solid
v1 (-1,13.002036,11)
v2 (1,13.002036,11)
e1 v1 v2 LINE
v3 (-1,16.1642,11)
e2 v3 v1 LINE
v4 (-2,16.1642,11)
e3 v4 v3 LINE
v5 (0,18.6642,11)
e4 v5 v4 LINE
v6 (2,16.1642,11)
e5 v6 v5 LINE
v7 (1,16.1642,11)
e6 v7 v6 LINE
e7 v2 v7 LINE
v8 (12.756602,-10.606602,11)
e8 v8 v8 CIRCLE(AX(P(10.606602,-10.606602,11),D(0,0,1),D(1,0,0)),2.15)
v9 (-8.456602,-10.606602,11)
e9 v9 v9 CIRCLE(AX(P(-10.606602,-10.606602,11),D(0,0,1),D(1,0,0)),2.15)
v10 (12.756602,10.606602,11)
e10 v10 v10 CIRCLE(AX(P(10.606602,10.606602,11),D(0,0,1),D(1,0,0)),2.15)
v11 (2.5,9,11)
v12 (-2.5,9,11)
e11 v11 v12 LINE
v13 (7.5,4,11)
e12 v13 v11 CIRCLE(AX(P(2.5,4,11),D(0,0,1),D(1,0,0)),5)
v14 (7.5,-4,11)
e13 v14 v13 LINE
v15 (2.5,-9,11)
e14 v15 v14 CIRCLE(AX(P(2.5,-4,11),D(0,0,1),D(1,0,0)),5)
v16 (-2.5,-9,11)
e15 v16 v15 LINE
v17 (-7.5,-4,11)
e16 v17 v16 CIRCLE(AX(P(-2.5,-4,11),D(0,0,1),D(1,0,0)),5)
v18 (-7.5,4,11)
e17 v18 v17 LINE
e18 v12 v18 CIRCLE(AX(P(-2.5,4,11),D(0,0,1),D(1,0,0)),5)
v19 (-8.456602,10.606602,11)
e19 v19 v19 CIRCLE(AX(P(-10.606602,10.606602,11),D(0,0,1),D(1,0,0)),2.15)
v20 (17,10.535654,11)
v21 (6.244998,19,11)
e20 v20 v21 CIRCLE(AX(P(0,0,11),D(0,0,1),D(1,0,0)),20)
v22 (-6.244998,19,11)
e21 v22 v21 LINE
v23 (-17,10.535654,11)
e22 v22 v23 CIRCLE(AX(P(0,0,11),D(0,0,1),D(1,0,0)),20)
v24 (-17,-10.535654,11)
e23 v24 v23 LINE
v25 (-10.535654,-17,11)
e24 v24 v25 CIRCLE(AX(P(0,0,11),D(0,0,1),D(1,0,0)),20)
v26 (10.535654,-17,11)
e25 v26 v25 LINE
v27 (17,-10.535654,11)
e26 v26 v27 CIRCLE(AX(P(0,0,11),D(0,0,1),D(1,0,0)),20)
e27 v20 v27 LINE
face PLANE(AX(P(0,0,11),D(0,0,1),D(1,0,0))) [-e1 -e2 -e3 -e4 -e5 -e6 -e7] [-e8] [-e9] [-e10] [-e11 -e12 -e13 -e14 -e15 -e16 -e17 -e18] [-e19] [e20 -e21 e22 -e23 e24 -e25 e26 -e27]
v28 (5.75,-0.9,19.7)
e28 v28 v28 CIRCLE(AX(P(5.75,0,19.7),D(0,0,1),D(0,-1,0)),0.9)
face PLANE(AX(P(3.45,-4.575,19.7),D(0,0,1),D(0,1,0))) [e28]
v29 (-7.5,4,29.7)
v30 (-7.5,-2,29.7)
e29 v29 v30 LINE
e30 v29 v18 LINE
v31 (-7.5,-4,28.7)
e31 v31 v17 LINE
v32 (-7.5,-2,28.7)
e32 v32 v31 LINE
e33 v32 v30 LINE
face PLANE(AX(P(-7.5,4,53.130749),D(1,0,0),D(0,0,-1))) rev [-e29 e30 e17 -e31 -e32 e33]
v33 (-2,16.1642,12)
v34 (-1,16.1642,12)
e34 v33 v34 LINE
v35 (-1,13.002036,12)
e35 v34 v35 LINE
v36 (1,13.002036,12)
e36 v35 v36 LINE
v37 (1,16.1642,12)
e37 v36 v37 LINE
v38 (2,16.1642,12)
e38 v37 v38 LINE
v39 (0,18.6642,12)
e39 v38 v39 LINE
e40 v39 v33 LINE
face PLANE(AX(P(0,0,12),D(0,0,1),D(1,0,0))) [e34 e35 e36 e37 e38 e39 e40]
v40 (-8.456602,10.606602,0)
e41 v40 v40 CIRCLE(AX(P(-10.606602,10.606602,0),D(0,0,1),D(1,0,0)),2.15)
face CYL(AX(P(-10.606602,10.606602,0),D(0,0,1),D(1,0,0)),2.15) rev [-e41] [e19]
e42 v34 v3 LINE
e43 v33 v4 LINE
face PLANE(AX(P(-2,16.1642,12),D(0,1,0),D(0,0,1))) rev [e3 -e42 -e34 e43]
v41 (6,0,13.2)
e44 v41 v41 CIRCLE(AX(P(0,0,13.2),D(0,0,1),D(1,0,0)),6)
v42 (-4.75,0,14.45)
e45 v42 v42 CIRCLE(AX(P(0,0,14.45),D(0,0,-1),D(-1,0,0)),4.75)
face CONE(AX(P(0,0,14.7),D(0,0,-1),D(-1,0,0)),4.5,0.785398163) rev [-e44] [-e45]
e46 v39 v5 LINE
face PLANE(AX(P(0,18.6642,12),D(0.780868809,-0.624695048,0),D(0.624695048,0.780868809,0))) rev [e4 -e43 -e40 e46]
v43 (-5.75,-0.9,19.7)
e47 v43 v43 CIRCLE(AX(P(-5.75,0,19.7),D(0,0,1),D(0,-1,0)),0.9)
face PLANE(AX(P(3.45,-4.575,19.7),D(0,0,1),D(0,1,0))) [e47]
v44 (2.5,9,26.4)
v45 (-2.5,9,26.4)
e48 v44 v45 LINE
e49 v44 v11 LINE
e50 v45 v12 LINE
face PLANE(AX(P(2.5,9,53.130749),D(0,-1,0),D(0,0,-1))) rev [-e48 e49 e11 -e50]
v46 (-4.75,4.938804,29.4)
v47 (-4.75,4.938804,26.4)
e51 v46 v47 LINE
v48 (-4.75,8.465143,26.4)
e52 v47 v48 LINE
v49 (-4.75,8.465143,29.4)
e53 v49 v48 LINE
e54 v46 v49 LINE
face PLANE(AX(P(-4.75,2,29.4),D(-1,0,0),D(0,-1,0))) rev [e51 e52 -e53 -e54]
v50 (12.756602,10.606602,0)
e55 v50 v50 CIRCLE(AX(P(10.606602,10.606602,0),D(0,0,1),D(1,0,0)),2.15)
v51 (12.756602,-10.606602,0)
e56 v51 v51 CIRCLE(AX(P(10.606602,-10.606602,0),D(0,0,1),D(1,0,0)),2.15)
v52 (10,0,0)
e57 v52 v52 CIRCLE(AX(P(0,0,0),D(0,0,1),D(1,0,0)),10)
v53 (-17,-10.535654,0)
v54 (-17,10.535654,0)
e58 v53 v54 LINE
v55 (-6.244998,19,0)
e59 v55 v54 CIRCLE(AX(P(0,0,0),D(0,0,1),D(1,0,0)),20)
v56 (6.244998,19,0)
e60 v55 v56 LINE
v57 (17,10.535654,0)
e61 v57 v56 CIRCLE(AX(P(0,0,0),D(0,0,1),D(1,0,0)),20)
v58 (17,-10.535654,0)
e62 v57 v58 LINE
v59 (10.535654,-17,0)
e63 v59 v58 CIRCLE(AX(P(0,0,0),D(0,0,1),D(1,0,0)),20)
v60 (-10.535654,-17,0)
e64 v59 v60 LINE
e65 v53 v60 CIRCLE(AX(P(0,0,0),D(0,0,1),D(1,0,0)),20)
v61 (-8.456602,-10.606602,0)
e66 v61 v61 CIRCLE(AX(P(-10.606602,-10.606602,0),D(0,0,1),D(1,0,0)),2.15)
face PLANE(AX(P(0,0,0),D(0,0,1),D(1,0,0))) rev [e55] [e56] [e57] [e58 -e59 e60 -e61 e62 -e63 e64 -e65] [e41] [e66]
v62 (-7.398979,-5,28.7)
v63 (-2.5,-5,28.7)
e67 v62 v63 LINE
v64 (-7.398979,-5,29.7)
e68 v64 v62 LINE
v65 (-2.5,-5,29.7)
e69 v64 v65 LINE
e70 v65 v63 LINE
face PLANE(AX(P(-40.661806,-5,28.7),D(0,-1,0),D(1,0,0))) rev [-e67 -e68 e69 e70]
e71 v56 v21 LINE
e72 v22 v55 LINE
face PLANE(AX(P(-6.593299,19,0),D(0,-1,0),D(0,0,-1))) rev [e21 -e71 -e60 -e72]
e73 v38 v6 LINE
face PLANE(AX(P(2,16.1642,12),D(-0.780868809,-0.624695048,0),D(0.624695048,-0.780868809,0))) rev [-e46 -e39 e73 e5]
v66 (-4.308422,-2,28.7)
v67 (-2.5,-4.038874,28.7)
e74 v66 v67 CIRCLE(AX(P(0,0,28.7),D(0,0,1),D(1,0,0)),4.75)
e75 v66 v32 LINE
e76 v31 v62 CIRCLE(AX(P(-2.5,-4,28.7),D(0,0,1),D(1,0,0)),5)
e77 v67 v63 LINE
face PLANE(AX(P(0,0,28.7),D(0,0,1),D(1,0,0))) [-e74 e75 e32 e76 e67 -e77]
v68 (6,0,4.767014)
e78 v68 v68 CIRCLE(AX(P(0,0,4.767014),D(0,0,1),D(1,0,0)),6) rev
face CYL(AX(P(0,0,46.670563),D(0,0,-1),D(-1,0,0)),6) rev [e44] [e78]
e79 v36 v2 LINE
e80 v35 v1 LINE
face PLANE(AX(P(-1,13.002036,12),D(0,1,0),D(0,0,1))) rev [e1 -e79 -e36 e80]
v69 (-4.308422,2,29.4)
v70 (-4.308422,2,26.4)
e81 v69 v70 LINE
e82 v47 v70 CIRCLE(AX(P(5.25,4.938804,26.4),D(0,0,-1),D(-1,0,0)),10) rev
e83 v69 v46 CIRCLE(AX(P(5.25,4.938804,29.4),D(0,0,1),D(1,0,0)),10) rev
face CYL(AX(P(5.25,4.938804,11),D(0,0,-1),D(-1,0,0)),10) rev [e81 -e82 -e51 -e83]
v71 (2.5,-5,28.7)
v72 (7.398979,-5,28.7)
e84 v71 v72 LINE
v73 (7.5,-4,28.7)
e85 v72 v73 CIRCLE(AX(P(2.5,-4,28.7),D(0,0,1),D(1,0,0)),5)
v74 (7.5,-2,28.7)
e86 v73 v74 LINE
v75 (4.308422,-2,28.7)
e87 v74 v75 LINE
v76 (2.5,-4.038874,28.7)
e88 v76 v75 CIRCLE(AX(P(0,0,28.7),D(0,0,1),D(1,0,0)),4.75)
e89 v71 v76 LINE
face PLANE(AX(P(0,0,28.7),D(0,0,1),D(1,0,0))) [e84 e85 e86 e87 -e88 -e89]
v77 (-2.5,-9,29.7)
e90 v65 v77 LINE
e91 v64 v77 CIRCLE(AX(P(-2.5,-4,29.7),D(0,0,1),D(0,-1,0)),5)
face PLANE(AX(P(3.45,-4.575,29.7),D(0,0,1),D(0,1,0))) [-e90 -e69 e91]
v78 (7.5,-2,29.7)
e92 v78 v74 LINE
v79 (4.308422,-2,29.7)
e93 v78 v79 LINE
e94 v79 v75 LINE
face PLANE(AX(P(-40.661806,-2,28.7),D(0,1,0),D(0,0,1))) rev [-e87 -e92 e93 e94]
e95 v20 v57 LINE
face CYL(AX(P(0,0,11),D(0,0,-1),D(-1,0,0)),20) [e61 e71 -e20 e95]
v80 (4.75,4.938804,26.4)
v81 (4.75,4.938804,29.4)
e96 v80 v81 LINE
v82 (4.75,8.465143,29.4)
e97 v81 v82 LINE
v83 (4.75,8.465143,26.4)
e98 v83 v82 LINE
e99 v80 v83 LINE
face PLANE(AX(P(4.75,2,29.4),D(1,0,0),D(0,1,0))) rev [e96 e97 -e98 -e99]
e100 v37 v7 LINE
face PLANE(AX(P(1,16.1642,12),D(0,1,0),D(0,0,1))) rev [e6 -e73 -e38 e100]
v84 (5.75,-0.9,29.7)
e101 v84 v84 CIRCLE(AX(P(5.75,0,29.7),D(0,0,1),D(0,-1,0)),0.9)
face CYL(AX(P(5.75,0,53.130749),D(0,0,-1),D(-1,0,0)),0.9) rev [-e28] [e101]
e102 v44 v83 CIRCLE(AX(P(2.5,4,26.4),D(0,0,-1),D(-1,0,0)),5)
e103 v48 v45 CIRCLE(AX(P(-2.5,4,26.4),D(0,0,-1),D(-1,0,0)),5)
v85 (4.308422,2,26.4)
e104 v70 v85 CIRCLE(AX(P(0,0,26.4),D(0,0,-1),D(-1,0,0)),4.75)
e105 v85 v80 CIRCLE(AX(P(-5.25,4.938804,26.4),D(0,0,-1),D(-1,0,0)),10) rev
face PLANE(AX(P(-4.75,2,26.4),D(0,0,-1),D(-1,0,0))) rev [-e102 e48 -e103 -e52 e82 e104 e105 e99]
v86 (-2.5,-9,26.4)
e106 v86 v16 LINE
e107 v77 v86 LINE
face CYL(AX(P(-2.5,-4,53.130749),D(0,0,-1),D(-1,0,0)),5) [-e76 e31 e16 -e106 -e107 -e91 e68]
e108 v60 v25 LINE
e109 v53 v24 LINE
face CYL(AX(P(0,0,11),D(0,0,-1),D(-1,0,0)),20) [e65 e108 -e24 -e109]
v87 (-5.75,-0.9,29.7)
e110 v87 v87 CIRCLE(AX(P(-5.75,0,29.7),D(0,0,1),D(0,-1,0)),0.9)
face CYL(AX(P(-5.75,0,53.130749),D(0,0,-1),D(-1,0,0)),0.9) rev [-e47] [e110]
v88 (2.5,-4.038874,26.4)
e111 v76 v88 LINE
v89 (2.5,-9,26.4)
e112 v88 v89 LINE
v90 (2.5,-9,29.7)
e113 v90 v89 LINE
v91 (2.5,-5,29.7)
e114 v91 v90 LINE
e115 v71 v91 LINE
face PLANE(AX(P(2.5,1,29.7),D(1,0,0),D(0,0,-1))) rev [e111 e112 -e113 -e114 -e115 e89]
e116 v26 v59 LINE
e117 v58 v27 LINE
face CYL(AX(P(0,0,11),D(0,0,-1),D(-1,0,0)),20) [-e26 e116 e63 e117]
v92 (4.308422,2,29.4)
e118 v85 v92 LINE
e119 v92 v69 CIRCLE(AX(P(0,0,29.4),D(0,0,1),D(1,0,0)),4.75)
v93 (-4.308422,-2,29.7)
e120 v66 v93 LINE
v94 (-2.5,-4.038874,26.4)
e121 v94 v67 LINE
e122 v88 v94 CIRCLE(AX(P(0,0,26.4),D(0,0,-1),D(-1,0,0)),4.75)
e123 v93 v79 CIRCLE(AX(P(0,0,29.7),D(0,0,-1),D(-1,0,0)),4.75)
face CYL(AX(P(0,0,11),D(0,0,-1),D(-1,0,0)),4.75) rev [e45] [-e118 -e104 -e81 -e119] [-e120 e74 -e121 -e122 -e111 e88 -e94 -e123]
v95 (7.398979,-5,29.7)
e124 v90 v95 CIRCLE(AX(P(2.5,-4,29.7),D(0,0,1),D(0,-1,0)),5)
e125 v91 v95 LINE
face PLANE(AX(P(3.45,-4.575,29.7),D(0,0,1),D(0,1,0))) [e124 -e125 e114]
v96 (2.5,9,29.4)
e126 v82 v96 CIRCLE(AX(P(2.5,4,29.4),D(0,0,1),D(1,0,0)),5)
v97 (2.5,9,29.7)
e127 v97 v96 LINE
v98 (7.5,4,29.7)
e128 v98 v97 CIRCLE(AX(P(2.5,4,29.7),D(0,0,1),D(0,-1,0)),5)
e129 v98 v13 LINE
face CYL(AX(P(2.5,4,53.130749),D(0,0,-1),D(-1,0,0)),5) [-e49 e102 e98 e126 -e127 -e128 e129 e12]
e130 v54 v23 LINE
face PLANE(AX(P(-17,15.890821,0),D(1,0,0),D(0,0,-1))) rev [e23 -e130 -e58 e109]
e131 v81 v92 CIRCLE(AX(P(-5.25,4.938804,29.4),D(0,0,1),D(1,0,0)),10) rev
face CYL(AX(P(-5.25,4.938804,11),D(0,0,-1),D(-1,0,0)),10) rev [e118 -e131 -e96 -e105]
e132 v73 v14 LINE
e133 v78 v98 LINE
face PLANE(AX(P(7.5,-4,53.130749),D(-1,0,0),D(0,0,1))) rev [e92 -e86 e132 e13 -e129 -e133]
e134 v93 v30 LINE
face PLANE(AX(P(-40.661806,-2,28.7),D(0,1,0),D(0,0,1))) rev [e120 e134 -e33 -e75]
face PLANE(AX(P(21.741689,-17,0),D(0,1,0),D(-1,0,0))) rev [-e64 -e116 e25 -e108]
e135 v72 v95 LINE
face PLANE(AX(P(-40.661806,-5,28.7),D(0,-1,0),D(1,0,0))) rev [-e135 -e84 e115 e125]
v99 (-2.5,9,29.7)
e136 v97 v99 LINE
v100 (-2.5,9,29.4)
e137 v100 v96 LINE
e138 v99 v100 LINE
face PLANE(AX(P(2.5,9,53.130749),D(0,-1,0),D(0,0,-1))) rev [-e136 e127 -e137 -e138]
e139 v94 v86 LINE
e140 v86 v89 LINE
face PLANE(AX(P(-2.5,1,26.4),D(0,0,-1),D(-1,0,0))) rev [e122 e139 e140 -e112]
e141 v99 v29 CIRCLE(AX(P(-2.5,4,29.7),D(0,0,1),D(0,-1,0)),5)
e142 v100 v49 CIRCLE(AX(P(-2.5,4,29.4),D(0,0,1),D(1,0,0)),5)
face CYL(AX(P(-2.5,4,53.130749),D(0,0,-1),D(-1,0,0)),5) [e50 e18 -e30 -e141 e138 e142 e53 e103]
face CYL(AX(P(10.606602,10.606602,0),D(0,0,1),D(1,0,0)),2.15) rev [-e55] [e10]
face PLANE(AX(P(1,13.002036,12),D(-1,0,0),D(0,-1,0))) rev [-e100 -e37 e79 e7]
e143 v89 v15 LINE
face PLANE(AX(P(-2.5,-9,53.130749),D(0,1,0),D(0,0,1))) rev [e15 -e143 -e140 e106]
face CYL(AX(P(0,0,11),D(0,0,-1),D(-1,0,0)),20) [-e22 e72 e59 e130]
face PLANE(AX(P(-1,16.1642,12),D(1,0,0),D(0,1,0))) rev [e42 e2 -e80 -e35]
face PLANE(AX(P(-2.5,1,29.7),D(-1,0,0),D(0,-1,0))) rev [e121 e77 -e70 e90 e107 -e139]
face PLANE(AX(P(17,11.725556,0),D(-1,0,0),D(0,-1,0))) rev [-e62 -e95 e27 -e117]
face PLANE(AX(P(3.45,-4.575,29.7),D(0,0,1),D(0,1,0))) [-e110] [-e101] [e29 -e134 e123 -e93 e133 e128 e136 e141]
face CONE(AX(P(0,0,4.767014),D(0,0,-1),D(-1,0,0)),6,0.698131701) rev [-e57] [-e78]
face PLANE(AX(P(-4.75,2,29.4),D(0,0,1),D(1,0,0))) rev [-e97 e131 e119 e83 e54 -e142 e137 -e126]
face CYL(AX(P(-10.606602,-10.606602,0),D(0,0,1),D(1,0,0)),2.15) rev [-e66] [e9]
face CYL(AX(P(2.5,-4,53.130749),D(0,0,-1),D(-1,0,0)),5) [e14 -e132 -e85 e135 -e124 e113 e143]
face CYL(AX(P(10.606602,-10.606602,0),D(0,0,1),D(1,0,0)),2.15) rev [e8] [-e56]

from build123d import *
from build123d.topology import SkipClean

# Parameters (mm, degrees)
SKETCH1_R           = 20
SKETCH1_R_2         = 4.75
BOSS_EXTRUDE1_DEPTH = 11
SKETCH2_W           = 13.186598354
SKETCH2_H           = 1
SKETCH2_W_2         = 3
SKETCH2_H_2         = 26.426474467
SKETCH2_H_3         = 26.621798467
SKETCH2_W_3         = 40.686040312
SKETCH2_H_4         = 3
CUT_EXTRUDE1_DEPTH  = 31.347981811
SKETCH3_R           = 2.15
CUT_EXTRUDE2_DEPTH  = 28.766886754
SKETCH5_R           = 0.9
BOSS_EXTRUDE2_DEPTH = 18.7
SKETCH13_R          = 0.9
BOSS_EXTRUDE3_DEPTH = 8.7
SKETCH7_W           = 68.268212127
SKETCH7_H           = 3
CUT_EXTRUDE4_DEPTH  = 1
SKETCH10_R          = 4.75
CUT_EXTRUDE6_DEPTH  = 40.141921261
SKETCH11_W          = 9.5
SKETCH11_H          = 3
CUT_EXTRUDE7_DEPTH  = 7
SKETCH12_R          = 6
CUT_EXTRUDE8_DEPTH  = 14.7
CHAMFER2_SIZE       = 1.5
CHAMFER1_SIZE       = 4
CHAMFER1_SIZE2      = 4.76701437
FILLET2_R           = 10
SKETCH14_W          = 5
SKETCH14_H          = 3.3
CUT_EXTRUDE9_DEPTH  = 10
BOSS_EXTRUDE4_DEPTH = 1


with BuildPart() as part:
    # Sketch1 → Boss-Extrude1 (new body)
    with BuildSketch(Plane.XY):
        Circle(SKETCH1_R)
        Circle(SKETCH1_R_2, mode=Mode.SUBTRACT)
    extrude(amount=BOSS_EXTRUDE1_DEPTH)

    # Sketch2 → Cut-Extrude1 (cut, through all)
    with BuildSketch(Plane.XY.offset(11)):
        with Locations((0, 19.5)):
            Rectangle(SKETCH2_W, SKETCH2_H)
        with Locations((-18.5, 2.677583481)):
            Rectangle(SKETCH2_W_2, SKETCH2_H_2)
        with Locations((18.5, -1.585343055)):
            Rectangle(SKETCH2_W_2, SKETCH2_H_3)
        with Locations((1.398669187, -18.5)):
            Rectangle(SKETCH2_W_3, SKETCH2_H_4)
    extrude(amount=-CUT_EXTRUDE1_DEPTH, mode=Mode.SUBTRACT)

    # Sketch3 → Cut-Extrude2 (cut, through all)
    with BuildSketch(Plane.XY.offset(11)):
        with Locations((-10.606601718, -10.606601718)):
            Circle(SKETCH3_R)
        with Locations((-10.606601718, 10.606601718)):
            Circle(SKETCH3_R)
        with Locations((10.606601718, 10.606601718)):
            Circle(SKETCH3_R)
        with Locations((10.606601718, -10.606601718)):
            Circle(SKETCH3_R)
    extrude(amount=-CUT_EXTRUDE2_DEPTH, mode=Mode.SUBTRACT)

    # Sketch5 → Boss-Extrude2 (add)
    with BuildSketch(Plane.XY.offset(11)):
        with BuildLine():
            Line((7.5, -4), (7.5, 4))
            ThreePointArc((7.5, 4), (6.035533906, 7.535533906), (2.5, 9))
            Line((2.5, 9), (-2.5, 9))
            ThreePointArc((-2.5, 9), (-6.035533906, 7.535533906), (-7.5, 4))
            Line((-7.5, 4), (-7.5, -4))
            ThreePointArc((-7.5, -4), (-6.035533906, -7.535533906), (-2.5, -9))
            Line((-2.5, -9), (2.5, -9))
            ThreePointArc((2.5, -9), (6.035533906, -7.535533906), (7.5, -4))
        make_face()
        with Locations(Location((-5.75, 0, 0), (0, 0, 270))):
            Circle(SKETCH5_R, mode=Mode.SUBTRACT)
        with Locations(Location((5.75, 0, 0), (0, 0, 270))):
            Circle(SKETCH5_R, mode=Mode.SUBTRACT)
    extrude(amount=BOSS_EXTRUDE2_DEPTH)

    # Sketch13 → Boss-Extrude3 (add)
    with BuildSketch(Plane.XY.offset(11)):
        with Locations(Location((5.75, 0, 0), (0, 0, 270))):
            Circle(SKETCH13_R)
        with Locations(Location((-5.75, 0, 0), (0, 0, 270))):
            Circle(SKETCH13_R)
    extrude(amount=BOSS_EXTRUDE3_DEPTH)

    # Sketch7 → Cut-Extrude4 (cut)
    with BuildSketch(Plane.XY.offset(29.7)):
        with Locations((-6.527699882, -3.5)):
            Rectangle(SKETCH7_W, SKETCH7_H)
    extrude(amount=-CUT_EXTRUDE4_DEPTH, mode=Mode.SUBTRACT)

    # Sketch10 → Cut-Extrude6 (cut, through all)
    with SkipClean():  # the faces are left unmerged after this step: merging them gives an invalid solid
        with BuildSketch(Plane(origin=(0, 0, 0), x_dir=(-1, 0, 0), z_dir=(0, 0, -1))):
            with Locations(Location((0, 0, 0), (0, 0, 335.09893763))):
                Circle(SKETCH10_R)
        extrude(amount=-CUT_EXTRUDE6_DEPTH, mode=Mode.SUBTRACT)

    # Sketch11 → Cut-Extrude7 (cut)
    with SkipClean():  # the faces are left unmerged after this step: merging them gives an invalid solid
        with BuildSketch(Plane(origin=(0, 9, 0), x_dir=(1, 0, 0), z_dir=(0, 1, 0))):
            with Locations((0, -27.9)):
                Rectangle(SKETCH11_W, SKETCH11_H)
        extrude(amount=-CUT_EXTRUDE7_DEPTH, mode=Mode.SUBTRACT)

    # Sketch12 → Cut-Extrude8 (cut)
    with BuildSketch(Plane(origin=(0, 0, 0), x_dir=(-1, 0, 0), z_dir=(0, 0, -1))):
        Circle(SKETCH12_R)
    extrude(amount=-CUT_EXTRUDE8_DEPTH, mode=Mode.SUBTRACT)

    # Chamfer2
    # the kernel refuses this chamfer: 1.5 mm, written as the material it adds along each edge
    with BuildSketch(Plane(origin=(0, 0, 14.7), x_dir=(-1, 0, 0), z_dir=(0, -1, 0))) as chamfer2_piece_1_section:
        Polygon((6, CHAMFER2_SIZE), (6 - CHAMFER2_SIZE, 0), (6, 0), align=None)
    chamfer2_piece_1 = revolve(axis=Axis((0, 0, 14.7), (0, 0, -1)), mode=Mode.PRIVATE)
    chamfer2_piece_1 = chamfer2_piece_1 - Plane(origin=(0, 0, 14.7), x_dir=(-0.9070362073508065, -0.4210526315731381, 0), z_dir=(0, 0, -1)) * Cylinder(4.75, 24, mode=Mode.PRIVATE)
    add(chamfer2_piece_1)

    # Chamfer1
    chamfer1_edges = [part.edges().sort_by_distance(p)[0] for p in [
        (6, 0, 0),
    ]]
    chamfer1_side = [part.faces().sort_by_distance(p)[0] for p in [
        (16.504823264, 0, 0),
    ]]
    chamfer(chamfer1_edges, length=CHAMFER1_SIZE, length2=CHAMFER1_SIZE2, reference=chamfer1_side[0])

    # Fillet2
    # the kernel refuses this fillet: 10 mm, written as the material it adds along each edge
    with BuildSketch(Plane(origin=(4.75, 2, 29.4), x_dir=(-1, 0, 0), z_dir=(0, 0, -1)), Plane(origin=(-4.75, 2, 19.052989911), x_dir=(1, 0, 0), z_dir=(0, 0, 1))) as fillet2_piece_1:
        with BuildLine():
            CenterArc((10, 2.938804035), FILLET2_R, 180, 17.090413612)
            Line((0, 2.938804035), (-0.2, 2.938804035))
            Line((-0.2, 2.938804035), (-0.2, 0))
            Line((-0.2, 0), (0, -0.2))
            ThreePointArc((0, -0.2), (0.220789008, -0.2), (0.250409575, -0.058776081))
            Line((0.250409575, -0.058776081), (0.441578015, 0))
        make_face()
    extrude(amount=10.347010089)

    # Sketch14 → Cut-Extrude9 (cut)
    with BuildSketch(Plane.XZ.offset(9)):
        with Locations((0, 28.05)):
            Rectangle(SKETCH14_W, SKETCH14_H)
    extrude(amount=-CUT_EXTRUDE9_DEPTH, mode=Mode.SUBTRACT)

    # Sketch15 → Boss-Extrude4 (add)
    with BuildSketch(Plane.XY.offset(11)):
        Polygon((-1, 13.002035862), (1, 13.002035862), (1, 16.164200489), (2, 16.164200489), (0, 18.664200489), (-2, 16.164200489), (-1, 16.164200489), align=None)
    extrude(amount=BOSS_EXTRUDE4_DEPTH)


solid = part.part
